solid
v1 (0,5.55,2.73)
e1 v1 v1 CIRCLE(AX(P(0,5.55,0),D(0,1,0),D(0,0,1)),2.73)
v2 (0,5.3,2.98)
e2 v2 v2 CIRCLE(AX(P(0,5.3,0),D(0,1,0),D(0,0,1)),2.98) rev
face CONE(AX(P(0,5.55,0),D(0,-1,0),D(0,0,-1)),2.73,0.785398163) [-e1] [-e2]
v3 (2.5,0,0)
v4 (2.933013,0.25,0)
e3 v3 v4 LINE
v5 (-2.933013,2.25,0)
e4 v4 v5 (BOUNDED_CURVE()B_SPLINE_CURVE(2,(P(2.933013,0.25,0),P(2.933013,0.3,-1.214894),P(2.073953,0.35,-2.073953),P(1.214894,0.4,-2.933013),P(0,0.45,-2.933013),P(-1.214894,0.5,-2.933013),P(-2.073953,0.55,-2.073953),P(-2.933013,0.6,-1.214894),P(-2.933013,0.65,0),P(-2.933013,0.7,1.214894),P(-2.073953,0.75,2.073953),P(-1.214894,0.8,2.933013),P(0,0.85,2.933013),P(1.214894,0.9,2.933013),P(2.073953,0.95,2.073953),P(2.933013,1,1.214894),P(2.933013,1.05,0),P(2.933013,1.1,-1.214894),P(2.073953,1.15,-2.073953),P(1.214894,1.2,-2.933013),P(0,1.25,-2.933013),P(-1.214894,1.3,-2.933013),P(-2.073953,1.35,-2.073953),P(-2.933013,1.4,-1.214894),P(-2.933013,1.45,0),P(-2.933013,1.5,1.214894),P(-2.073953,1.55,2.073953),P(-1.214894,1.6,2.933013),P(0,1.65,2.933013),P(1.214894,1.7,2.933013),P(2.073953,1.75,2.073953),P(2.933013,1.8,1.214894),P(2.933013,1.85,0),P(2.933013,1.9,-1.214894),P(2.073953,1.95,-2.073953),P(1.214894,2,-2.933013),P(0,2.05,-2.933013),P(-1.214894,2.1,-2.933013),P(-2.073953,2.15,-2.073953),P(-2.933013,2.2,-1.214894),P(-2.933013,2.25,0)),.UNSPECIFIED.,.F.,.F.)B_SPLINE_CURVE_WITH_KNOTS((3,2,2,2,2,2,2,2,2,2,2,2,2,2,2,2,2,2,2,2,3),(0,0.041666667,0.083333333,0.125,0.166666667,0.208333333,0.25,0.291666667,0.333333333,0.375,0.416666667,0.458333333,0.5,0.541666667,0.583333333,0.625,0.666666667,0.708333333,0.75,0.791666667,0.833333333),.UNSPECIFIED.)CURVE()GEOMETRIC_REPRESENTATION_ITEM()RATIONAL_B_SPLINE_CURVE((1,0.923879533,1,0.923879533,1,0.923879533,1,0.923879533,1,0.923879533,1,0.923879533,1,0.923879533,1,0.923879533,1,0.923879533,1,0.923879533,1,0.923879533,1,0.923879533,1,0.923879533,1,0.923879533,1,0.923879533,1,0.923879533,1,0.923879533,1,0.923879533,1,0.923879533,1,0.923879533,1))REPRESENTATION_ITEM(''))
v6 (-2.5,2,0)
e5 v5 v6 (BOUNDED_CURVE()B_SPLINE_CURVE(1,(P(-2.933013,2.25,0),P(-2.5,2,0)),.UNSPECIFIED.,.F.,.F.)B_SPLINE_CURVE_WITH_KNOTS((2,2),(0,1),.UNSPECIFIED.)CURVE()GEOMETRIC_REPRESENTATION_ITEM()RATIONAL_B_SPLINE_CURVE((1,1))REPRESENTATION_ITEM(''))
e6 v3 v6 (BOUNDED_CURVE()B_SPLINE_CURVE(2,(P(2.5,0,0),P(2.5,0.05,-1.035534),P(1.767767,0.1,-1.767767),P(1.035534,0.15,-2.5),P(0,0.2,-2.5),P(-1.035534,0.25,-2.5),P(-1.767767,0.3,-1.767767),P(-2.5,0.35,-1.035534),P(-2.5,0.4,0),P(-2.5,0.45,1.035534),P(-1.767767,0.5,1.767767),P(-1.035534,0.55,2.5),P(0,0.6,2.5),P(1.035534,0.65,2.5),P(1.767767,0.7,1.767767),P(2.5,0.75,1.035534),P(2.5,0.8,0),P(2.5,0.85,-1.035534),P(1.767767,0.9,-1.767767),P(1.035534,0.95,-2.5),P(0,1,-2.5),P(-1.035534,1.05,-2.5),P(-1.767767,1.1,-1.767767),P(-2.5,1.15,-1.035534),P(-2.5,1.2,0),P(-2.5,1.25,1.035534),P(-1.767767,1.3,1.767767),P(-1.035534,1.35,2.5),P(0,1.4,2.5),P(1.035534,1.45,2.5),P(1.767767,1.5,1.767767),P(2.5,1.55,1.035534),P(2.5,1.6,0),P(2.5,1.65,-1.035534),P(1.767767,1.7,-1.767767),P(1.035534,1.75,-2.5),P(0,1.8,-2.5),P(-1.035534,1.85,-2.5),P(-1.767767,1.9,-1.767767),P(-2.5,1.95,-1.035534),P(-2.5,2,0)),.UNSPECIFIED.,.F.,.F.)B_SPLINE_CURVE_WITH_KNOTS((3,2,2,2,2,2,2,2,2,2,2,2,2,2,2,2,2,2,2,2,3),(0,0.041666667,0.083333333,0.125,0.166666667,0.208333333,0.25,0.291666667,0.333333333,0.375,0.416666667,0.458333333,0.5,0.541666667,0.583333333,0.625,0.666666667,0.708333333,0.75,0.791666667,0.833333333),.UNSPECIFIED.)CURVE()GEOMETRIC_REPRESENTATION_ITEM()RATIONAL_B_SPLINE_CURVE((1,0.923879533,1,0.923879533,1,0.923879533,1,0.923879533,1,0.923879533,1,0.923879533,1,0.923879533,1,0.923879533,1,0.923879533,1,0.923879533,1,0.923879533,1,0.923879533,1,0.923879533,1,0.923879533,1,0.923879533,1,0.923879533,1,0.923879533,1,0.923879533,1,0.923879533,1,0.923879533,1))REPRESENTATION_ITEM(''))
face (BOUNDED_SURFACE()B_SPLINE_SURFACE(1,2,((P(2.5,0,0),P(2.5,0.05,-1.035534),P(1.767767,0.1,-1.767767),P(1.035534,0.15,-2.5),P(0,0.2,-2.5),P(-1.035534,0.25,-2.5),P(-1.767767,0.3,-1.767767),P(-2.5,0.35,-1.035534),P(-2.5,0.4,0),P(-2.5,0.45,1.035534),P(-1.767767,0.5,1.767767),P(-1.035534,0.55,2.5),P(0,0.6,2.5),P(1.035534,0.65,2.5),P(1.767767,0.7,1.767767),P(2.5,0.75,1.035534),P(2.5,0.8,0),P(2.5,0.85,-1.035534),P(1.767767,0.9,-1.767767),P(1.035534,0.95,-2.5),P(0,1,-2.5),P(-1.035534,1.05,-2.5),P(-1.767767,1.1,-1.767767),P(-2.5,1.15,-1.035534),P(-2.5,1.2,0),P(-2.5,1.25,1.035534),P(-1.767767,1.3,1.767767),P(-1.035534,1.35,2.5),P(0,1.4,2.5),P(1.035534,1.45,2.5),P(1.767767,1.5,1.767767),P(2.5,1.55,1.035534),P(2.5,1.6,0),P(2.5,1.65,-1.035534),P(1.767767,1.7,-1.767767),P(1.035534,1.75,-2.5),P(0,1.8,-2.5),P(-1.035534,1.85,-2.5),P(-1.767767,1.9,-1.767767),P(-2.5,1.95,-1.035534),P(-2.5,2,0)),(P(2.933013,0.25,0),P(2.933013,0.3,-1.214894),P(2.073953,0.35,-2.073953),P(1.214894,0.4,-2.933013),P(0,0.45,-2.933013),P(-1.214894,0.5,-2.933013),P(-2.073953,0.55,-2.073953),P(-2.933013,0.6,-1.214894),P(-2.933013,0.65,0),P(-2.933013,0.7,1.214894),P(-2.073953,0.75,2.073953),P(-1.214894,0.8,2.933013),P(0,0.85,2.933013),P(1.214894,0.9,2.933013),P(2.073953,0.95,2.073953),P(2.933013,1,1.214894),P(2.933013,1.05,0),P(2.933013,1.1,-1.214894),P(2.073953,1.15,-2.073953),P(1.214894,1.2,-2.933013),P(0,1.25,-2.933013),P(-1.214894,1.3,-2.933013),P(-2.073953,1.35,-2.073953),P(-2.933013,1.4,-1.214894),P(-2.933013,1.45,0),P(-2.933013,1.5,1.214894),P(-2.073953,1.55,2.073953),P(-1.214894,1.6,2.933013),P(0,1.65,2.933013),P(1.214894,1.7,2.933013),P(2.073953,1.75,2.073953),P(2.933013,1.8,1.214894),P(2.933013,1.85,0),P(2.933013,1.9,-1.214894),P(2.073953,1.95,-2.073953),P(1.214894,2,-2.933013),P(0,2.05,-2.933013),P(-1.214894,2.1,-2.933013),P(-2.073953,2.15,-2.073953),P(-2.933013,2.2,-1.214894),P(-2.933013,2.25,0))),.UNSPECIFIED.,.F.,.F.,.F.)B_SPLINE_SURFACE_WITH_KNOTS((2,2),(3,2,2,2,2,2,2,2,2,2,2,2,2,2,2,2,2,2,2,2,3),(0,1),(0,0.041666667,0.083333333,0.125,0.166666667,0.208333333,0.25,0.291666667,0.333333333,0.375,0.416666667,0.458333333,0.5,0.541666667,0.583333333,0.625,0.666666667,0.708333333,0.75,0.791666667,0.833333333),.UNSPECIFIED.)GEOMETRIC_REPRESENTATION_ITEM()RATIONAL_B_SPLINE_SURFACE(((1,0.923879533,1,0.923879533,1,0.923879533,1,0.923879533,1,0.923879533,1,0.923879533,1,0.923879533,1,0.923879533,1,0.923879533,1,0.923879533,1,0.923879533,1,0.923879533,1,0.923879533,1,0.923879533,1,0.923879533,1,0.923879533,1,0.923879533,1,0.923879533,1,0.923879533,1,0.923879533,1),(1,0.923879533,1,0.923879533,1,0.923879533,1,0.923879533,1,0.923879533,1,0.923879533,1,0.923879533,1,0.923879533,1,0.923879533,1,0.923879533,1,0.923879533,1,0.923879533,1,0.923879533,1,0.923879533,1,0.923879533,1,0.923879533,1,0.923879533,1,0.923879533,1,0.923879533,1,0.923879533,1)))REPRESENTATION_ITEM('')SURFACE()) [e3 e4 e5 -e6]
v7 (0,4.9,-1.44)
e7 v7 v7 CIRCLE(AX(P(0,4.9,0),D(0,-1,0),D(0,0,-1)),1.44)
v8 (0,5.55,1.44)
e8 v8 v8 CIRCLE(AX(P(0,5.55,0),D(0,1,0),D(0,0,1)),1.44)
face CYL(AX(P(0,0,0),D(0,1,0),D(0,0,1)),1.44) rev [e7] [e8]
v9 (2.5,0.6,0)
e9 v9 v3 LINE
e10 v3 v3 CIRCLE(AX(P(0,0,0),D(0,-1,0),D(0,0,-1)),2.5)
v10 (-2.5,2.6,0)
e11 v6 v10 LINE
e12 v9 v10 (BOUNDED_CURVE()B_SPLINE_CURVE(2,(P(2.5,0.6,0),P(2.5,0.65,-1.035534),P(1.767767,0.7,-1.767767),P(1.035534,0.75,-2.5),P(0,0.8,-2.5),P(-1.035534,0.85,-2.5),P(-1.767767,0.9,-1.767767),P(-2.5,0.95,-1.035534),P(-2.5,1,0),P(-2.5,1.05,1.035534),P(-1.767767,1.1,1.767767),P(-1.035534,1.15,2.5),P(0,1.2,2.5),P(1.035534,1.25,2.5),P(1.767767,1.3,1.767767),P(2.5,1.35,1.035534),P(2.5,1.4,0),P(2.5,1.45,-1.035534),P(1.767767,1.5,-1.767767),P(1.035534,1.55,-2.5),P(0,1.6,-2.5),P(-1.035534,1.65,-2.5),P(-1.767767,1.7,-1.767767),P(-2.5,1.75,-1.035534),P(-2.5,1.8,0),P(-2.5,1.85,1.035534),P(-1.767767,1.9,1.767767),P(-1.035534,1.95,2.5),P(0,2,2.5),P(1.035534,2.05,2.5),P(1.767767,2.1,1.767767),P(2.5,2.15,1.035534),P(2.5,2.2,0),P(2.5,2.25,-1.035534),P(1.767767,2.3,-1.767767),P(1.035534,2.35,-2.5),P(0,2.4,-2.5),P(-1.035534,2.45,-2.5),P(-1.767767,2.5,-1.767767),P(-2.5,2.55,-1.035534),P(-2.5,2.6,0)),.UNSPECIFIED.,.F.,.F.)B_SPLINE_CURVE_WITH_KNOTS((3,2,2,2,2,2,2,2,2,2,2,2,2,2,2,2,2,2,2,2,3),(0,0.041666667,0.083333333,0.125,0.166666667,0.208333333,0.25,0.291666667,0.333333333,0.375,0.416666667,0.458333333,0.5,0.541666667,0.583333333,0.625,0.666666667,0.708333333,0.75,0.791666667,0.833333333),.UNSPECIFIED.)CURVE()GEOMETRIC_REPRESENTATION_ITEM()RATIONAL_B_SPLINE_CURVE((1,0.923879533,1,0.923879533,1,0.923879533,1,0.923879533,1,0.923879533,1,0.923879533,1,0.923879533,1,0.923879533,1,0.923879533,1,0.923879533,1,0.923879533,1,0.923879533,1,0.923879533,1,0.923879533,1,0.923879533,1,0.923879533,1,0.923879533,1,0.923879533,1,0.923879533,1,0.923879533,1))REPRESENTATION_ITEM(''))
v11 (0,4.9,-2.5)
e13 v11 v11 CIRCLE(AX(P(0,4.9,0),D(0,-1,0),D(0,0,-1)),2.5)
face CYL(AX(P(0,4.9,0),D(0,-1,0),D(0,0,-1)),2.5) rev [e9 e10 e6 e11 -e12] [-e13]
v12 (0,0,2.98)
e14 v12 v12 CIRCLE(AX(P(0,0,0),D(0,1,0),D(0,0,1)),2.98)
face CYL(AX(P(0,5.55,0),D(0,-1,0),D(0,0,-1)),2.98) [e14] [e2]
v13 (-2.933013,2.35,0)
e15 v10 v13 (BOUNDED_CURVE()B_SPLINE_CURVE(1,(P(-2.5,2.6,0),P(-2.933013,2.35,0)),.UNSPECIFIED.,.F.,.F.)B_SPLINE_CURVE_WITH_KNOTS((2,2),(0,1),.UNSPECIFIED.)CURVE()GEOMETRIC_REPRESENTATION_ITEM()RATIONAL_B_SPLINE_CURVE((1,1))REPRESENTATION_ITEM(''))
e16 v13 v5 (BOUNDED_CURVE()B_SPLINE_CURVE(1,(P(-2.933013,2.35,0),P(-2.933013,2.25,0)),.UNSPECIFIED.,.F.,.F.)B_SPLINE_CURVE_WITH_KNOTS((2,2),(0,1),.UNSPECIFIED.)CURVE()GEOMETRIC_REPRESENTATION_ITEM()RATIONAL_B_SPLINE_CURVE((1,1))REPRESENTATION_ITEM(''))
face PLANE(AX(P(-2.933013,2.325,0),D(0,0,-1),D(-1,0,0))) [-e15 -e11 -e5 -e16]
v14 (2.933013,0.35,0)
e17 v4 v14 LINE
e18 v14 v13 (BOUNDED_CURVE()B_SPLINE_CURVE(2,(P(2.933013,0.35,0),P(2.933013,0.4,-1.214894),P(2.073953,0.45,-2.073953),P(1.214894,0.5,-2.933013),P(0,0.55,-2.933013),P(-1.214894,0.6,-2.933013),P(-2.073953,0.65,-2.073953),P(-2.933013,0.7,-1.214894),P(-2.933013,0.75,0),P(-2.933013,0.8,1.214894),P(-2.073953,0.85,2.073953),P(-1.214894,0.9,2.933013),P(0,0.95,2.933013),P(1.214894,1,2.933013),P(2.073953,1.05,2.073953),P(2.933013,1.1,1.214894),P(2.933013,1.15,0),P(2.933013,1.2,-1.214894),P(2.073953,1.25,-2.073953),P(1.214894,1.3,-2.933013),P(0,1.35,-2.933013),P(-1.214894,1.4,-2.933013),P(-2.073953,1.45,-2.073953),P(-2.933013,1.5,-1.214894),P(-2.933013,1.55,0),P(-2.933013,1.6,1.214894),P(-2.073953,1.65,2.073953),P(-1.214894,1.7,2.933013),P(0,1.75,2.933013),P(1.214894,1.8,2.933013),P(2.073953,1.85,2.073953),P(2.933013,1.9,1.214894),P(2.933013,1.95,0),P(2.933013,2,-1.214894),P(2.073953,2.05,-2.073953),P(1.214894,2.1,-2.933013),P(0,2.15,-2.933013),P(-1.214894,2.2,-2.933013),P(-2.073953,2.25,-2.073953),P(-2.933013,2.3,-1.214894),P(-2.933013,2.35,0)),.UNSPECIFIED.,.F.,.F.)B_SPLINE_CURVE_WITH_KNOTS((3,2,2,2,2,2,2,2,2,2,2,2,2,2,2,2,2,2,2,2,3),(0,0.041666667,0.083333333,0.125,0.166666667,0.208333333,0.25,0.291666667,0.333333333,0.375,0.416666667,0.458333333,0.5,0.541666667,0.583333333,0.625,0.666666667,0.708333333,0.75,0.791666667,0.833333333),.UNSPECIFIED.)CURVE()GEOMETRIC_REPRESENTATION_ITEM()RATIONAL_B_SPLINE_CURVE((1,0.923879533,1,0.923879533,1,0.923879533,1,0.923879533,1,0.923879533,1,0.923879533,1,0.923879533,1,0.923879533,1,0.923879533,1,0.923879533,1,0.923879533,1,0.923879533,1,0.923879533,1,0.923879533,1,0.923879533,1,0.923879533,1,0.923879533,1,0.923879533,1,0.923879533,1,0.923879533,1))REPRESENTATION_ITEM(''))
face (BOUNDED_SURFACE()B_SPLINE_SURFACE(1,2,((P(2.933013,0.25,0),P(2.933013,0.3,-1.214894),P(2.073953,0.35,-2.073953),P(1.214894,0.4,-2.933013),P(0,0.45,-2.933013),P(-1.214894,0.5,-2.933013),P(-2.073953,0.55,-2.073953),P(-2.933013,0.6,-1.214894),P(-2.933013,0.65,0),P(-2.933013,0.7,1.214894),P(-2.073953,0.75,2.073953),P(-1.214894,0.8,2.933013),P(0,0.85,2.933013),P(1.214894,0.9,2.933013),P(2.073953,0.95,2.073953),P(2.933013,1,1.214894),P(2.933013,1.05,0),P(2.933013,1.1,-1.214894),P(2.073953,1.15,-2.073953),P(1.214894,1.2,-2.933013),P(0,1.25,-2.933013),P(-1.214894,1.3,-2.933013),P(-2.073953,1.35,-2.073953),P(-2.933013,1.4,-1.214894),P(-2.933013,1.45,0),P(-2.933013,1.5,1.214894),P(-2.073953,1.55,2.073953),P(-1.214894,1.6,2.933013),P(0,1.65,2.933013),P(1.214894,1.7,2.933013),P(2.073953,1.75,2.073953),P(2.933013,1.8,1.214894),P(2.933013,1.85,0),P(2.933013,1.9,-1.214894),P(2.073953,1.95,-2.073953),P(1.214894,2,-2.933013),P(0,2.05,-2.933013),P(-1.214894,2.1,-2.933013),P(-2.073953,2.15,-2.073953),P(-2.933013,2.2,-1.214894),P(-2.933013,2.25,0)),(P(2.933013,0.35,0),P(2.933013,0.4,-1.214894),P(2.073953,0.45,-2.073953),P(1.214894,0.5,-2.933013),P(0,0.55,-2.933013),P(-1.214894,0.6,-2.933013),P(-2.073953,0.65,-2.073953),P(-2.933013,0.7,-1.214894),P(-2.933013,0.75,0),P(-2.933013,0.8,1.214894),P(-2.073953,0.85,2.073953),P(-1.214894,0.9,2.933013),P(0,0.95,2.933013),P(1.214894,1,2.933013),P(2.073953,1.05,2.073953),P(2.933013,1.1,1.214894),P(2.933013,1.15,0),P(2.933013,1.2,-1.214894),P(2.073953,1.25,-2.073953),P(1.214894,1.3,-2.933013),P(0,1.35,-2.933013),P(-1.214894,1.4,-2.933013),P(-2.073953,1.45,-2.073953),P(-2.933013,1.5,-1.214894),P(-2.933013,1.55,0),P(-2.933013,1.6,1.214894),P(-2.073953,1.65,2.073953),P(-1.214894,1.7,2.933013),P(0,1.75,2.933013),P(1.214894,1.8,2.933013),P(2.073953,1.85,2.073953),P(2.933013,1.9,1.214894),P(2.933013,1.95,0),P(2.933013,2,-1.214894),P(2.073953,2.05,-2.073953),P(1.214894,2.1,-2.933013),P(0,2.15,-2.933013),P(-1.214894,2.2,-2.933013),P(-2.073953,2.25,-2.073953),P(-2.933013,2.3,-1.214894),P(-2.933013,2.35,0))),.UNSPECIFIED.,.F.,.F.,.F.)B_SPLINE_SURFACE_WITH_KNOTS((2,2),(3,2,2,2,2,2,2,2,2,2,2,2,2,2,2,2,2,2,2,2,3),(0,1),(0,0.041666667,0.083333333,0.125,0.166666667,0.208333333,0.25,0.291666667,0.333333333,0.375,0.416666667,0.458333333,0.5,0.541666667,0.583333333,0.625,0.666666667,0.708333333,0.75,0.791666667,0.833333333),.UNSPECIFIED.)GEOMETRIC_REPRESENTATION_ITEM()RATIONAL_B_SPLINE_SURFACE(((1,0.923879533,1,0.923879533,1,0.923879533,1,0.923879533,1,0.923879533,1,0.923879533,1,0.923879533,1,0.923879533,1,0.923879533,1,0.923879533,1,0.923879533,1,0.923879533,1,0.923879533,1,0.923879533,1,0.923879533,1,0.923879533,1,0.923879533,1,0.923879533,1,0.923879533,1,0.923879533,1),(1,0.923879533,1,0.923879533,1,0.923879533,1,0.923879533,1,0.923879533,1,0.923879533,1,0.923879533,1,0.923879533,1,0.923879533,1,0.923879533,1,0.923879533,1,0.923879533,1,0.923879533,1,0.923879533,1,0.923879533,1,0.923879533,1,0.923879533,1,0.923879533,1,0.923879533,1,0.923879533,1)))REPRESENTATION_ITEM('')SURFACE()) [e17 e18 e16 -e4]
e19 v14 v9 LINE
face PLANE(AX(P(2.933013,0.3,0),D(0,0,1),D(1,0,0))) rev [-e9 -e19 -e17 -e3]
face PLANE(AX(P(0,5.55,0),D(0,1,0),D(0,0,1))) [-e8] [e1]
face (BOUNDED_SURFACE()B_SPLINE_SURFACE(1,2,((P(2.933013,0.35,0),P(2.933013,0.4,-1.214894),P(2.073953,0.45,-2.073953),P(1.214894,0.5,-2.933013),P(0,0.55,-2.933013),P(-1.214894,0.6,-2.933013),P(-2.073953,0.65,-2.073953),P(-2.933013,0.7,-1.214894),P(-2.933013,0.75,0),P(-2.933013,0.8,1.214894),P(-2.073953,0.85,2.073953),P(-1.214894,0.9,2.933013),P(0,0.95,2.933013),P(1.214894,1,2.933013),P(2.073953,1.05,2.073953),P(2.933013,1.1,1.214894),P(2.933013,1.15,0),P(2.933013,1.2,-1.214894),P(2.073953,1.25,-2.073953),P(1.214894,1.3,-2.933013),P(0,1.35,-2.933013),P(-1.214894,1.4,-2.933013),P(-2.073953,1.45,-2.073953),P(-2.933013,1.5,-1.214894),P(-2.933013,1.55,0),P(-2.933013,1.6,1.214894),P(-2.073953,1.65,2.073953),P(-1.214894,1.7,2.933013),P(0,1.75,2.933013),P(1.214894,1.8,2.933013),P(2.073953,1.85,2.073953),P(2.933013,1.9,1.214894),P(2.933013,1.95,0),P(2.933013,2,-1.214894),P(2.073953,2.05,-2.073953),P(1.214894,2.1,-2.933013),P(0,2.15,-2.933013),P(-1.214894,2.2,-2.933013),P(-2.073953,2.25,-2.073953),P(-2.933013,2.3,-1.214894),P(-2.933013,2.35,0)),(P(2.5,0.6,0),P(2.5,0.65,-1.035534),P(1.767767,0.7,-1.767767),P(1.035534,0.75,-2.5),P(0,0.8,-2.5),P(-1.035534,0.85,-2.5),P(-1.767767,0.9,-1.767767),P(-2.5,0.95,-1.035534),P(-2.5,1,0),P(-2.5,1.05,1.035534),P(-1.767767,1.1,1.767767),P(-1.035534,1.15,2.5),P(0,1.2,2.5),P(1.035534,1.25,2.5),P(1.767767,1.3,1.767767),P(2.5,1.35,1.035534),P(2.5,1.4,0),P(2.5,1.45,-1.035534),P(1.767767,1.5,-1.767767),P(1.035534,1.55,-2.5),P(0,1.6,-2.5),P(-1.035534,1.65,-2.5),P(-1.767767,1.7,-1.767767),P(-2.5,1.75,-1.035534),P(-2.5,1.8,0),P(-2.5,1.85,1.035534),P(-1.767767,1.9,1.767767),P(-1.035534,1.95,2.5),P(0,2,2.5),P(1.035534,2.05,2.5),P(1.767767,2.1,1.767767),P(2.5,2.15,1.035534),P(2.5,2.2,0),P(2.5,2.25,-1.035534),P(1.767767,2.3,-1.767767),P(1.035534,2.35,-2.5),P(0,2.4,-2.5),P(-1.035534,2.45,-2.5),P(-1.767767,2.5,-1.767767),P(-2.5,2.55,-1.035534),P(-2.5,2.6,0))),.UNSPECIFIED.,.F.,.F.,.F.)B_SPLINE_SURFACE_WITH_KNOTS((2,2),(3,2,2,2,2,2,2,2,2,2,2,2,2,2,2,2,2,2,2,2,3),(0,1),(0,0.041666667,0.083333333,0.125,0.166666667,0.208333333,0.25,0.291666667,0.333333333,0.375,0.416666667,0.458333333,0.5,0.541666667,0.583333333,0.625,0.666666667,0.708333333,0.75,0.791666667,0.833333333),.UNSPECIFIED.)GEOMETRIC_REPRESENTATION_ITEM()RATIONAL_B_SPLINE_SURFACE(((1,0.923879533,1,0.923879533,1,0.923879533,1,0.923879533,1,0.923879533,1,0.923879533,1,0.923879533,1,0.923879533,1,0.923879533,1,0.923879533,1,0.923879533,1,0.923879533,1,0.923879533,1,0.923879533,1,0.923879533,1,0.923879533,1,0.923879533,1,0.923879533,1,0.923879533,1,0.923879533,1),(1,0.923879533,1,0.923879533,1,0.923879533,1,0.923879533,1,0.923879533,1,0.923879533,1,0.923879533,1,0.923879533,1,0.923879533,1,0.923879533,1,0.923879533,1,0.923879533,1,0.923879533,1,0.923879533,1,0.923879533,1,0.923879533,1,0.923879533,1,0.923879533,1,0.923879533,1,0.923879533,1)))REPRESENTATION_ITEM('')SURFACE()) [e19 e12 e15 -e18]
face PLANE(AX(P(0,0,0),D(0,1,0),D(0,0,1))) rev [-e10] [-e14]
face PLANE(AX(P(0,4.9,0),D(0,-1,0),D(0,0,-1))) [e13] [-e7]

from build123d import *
from build123d.topology import SkipClean

# Parameters (mm, degrees)
SKETCH1_R           = 2.98
BOSS_EXTRUDE1_DEPTH = 5.55
SKETCH2_R           = 2.5
CUT_EXTRUDE1_DEPTH  = 4.9
SKETCH3_R           = 1.44
CUT_EXTRUDE2_DEPTH  = 7.968737332
CHAMFER1_SIZE       = 0.25
THREAD1_PITCH       = 0.8


with BuildPart() as part:
    # Sketch1 → Boss-Extrude1 (new body)
    with BuildSketch(Plane(origin=(0, 0, 0), x_dir=(1, 0, 0), z_dir=(0, 1, 0))):
        with Locations(Location((0, 0, 0), (0, 0, 270))):
            Circle(SKETCH1_R)
    extrude(amount=BOSS_EXTRUDE1_DEPTH)

    # Sketch2 → Cut-Extrude1 (cut)
    with BuildSketch(Plane.XZ):
        with Locations(Location((0, 0, 0), (0, 0, 270))):
            Circle(SKETCH2_R)
    extrude(amount=-CUT_EXTRUDE1_DEPTH, mode=Mode.SUBTRACT)

    # Sketch3 → Cut-Extrude2 (cut, through all)
    with BuildSketch(Plane(origin=(0, 5.55, 0), x_dir=(1, 0, 0), z_dir=(0, 1, 0))):
        with Locations(Location((0, 0, 0), (0, 0, 270))):
            Circle(SKETCH3_R)
    extrude(amount=-CUT_EXTRUDE2_DEPTH, mode=Mode.SUBTRACT)

    # Chamfer1
    chamfer1_edges = [part.edges().sort_by_distance(p)[0] for p in [
        (0, 5.55, -2.98),
    ]]
    chamfer(chamfer1_edges, length=CHAMFER1_SIZE)

    # Thread1: the profile of Thread Profile1 profile screwed along a right-hand helix of 2.5 turns, 8 arcs to a turn; built about Z, then put on its axis
    with SkipClean():  # the faces are left unmerged after this step: merging them gives an invalid solid
        thread1_z = Axis((0, 0, 0), (0, 0, 1))
        thread1_corners = [(2.4997, 0, -0.000173205), (2.9330127, 0, 0.249999999), (2.9330127, 0, 0.349999999), (2.4997, 0, 0.600173203)]
        with BuildLine(mode=Mode.PRIVATE) as thread1_profile:
            Line(thread1_corners[0], thread1_corners[1])
            Line(thread1_corners[1], thread1_corners[2])
            Line(thread1_corners[2], thread1_corners[3])
            Line(thread1_corners[3], thread1_corners[0])
        thread1_cap = Face(thread1_profile.wire())
        thread1_turn_angles = [0, 22.5, 45, 67.5, 90, 112.5, 135, 157.5, 180, 202.5, 225, 247.5, 270, 292.5, 315, 337.5, 360]
        thread1_turn_weights = [1, 0.9238795325112867, 1, 0.9238795325112867, 1, 0.9238795325112867, 1, 0.9238795325112867, 1, 0.9238795325112867, 1, 0.9238795325112867, 1, 0.9238795325112867, 1, 0.9238795325112867, 1]
        thread1_turn_rails = [Edge.make_bspline([Vector(p[0], p[1], 0).rotate(thread1_z, thread1_turn_angles[k]) / thread1_turn_weights[k] + Vector(0, 0, p[2] + THREAD1_PITCH * thread1_turn_angles[k] / 360) for k in range(17)], [0, 0, 0, 1, 1, 2, 2, 3, 3, 4, 4, 5, 5, 6, 6, 7, 7, 8, 8, 8], 2, thread1_turn_weights) for p in thread1_corners]
        thread1_turn_sides = [Face.make_surface_from_curves(thread1_turn_rails[p[0]], thread1_turn_rails[p[1]]) for p in [(0, 1), (1, 2), (2, 3), (3, 0)]]
        thread1_last_angles = [720, 742.5, 765, 787.5, 810, 832.5, 855, 877.5, 900]
        thread1_last_weights = [1, 0.9238795325112867, 1, 0.9238795325112867, 1, 0.9238795325112867, 1, 0.9238795325112867, 1]
        thread1_last_rails = [Edge.make_bspline([Vector(p[0], p[1], 0).rotate(thread1_z, thread1_last_angles[k]) / thread1_last_weights[k] + Vector(0, 0, p[2] + THREAD1_PITCH * thread1_last_angles[k] / 360) for k in range(9)], [0, 0, 0, 1, 1, 2, 2, 3, 3, 4, 4, 4], 2, thread1_last_weights) for p in thread1_corners]
        thread1_last_sides = [Face.make_surface_from_curves(thread1_last_rails[p[0]], thread1_last_rails[p[1]]) for p in [(0, 1), (1, 2), (2, 3), (3, 0)]]
        thread1 = Plane(origin=(0, 0, 0), x_dir=(1, 0, 0), z_dir=(0, 1, 0)) * Solid(Shell([*[p.moved(Location((0, 0, THREAD1_PITCH * i))) for i in range(2) for p in thread1_turn_sides], *thread1_last_sides, thread1_cap, thread1_cap.rotate(thread1_z, 900).moved(Location((0, 0, THREAD1_PITCH * 900 / 360)))]))
        add(thread1, mode=Mode.SUBTRACT)


solid = part.part
